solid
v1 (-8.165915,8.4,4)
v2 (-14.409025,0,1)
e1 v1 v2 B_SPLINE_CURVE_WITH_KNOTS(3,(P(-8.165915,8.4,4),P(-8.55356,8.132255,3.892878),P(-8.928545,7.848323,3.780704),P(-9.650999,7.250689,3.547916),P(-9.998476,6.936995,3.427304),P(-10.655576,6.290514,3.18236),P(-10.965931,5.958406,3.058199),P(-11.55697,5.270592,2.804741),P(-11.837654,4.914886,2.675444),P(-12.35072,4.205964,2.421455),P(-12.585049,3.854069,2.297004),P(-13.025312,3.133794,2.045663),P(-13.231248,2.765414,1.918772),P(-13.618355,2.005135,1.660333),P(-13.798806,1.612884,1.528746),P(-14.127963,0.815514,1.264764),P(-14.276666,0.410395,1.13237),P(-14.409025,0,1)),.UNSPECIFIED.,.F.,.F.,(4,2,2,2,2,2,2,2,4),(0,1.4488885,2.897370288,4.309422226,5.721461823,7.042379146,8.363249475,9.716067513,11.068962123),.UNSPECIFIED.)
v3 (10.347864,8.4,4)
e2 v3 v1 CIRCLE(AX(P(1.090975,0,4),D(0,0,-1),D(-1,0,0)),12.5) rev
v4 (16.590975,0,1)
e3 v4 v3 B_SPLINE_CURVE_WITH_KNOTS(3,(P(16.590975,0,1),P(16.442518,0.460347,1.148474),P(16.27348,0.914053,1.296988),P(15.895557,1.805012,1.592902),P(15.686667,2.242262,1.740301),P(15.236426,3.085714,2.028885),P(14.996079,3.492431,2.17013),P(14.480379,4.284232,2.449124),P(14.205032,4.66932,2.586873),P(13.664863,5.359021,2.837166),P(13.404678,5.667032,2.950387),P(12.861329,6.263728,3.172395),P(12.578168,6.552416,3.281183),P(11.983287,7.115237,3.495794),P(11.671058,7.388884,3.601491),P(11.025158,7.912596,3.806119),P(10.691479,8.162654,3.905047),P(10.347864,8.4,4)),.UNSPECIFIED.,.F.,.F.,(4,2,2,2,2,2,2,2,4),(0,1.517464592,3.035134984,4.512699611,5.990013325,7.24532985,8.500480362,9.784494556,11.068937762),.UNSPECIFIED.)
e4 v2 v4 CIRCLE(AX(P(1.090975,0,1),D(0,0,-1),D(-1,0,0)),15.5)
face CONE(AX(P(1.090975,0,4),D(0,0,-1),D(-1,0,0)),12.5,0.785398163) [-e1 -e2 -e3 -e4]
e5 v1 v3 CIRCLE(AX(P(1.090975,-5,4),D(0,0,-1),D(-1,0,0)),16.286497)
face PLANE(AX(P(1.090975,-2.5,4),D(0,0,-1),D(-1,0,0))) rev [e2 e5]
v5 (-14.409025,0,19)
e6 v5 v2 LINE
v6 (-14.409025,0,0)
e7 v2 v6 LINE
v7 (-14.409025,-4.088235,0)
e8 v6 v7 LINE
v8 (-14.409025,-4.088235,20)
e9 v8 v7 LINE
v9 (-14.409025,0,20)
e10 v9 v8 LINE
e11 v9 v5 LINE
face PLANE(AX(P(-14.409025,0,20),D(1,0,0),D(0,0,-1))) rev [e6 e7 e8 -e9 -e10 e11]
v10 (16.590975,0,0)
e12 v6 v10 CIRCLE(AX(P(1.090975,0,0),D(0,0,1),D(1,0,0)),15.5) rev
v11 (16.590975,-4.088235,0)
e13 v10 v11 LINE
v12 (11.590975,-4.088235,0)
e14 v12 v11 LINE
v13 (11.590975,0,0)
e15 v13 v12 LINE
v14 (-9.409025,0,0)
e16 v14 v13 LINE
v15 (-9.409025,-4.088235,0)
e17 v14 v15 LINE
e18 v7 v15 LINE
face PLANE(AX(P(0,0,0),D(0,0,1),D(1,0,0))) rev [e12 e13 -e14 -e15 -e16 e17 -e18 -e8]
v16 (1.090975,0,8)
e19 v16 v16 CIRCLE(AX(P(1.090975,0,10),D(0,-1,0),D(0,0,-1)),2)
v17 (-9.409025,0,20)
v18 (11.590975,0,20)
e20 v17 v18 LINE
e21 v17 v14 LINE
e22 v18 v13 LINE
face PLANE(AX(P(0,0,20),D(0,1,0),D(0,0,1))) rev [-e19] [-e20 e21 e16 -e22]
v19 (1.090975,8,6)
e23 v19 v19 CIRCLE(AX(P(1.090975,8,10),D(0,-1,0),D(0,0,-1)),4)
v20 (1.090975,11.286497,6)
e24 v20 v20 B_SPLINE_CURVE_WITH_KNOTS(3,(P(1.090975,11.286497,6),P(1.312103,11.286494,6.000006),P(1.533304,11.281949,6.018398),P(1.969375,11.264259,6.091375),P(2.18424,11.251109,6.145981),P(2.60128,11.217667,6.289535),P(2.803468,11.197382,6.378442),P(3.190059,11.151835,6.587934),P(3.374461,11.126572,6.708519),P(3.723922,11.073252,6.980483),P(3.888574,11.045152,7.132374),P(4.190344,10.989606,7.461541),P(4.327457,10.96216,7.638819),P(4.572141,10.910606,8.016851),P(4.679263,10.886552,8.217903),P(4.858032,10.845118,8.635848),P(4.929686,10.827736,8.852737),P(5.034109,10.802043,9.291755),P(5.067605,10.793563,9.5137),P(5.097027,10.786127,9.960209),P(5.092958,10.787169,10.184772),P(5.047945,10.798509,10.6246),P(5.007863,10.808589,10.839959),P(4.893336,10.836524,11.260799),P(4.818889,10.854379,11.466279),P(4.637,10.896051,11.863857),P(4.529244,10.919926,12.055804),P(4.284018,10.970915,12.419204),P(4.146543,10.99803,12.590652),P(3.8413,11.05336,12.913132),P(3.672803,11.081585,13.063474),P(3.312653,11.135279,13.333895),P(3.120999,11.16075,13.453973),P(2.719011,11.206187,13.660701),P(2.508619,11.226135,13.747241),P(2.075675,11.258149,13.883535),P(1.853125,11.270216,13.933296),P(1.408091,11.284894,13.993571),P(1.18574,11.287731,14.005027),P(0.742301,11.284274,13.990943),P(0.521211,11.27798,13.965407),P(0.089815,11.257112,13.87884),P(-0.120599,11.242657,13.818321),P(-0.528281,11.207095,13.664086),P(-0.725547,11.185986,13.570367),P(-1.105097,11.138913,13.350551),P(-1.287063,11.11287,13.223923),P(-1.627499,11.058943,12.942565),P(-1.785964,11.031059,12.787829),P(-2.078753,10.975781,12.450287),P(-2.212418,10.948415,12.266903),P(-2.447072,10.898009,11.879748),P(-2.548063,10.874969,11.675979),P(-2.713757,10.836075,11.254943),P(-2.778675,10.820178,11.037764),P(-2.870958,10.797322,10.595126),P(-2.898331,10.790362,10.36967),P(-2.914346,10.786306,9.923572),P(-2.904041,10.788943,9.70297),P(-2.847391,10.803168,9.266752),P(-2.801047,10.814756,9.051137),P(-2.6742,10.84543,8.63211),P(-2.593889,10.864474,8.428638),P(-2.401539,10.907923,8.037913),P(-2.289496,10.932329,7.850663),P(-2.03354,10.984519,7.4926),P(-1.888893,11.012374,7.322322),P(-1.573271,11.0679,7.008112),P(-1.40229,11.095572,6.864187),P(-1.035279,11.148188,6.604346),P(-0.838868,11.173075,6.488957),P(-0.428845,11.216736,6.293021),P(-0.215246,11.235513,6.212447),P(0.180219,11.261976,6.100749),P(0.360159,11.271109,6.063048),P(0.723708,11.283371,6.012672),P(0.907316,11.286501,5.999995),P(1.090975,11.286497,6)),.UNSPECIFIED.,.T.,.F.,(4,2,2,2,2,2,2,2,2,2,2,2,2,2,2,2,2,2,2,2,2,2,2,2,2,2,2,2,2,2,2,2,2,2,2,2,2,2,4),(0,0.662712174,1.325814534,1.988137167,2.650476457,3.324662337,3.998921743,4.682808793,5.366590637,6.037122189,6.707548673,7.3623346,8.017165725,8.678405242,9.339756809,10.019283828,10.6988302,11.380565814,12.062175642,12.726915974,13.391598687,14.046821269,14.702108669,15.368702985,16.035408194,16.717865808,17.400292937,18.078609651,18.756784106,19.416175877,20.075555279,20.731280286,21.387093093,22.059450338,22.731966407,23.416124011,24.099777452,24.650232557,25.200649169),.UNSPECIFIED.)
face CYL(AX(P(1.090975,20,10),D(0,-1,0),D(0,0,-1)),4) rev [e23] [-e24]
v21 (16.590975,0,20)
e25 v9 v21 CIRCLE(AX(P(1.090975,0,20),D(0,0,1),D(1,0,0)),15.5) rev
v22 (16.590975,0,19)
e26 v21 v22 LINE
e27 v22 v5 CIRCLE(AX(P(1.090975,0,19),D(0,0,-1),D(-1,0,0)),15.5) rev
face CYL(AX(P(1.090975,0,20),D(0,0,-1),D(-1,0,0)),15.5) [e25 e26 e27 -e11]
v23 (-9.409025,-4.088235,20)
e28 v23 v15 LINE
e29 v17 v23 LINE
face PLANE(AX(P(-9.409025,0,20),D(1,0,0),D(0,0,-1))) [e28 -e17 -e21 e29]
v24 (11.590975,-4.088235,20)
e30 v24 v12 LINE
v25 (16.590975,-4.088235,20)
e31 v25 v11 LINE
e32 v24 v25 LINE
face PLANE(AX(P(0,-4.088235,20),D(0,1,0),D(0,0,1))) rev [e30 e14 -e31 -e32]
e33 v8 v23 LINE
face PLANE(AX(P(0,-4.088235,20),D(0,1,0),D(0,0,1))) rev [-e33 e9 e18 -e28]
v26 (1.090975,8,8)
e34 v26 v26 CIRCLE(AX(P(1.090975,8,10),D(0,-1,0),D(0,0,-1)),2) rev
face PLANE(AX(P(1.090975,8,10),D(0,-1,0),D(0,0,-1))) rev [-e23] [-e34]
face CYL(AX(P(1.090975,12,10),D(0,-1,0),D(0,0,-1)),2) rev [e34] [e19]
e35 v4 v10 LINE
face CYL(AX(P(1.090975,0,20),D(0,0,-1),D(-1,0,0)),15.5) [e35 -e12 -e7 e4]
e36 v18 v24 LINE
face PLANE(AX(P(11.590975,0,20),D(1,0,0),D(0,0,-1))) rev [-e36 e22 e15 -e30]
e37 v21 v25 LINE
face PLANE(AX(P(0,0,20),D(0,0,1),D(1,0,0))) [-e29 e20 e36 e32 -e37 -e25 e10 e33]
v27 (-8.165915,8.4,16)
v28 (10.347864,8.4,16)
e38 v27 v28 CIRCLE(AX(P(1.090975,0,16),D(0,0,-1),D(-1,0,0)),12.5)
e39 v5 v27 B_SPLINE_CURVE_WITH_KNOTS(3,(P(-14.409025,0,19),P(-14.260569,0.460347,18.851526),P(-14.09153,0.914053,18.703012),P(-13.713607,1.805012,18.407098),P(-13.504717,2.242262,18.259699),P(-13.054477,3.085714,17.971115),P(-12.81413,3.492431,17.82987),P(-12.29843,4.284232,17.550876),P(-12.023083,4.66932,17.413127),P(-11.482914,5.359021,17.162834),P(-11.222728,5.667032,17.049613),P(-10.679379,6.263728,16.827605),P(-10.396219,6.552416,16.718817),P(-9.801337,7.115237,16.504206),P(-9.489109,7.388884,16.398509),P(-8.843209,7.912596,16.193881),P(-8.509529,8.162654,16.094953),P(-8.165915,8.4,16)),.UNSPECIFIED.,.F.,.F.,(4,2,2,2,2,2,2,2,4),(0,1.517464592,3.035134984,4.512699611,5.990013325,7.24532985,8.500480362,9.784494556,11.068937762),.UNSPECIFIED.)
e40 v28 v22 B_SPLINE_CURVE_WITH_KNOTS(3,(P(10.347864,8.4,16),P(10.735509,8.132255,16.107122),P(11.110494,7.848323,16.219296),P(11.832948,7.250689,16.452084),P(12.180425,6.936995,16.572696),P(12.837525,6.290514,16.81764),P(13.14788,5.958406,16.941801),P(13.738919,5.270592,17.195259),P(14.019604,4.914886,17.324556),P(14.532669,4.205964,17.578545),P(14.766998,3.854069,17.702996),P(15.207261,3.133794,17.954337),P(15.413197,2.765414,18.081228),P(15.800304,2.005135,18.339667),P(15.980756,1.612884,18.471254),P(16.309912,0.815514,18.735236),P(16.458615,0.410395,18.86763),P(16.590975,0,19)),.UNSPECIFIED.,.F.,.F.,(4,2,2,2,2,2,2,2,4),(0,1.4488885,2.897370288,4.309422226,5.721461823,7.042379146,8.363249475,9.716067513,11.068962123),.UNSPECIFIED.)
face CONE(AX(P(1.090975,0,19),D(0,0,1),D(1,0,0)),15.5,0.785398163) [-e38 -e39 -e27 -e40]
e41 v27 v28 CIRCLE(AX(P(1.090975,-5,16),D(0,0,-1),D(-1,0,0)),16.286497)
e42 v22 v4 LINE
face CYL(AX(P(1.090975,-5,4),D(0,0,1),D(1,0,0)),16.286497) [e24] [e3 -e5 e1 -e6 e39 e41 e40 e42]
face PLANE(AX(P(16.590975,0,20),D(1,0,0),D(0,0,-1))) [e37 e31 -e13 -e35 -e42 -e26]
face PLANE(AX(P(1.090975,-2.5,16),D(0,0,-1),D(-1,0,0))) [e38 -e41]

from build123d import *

# Parameters (mm, degrees)
ESQUISSE1_W             = 5
ESQUISSE1_H             = 4.088235294
BOSS_EXTRU_1_DEPTH      = 20
ENL_V_START             = -16
ENL_V_MAT_EXTRU_1_DEPTH = 12
CHANFREIN1_SIZE         = 3
ESQUISSE3_R             = 2
ENL_V_MAT_EXTRU_2_DEPTH = 12
ENL_V_START_2           = -8
ESQUISSE4_R             = 4
ENL_V_MAT_EXTRU_3_DEPTH = 12


with BuildPart() as part:
    # Esquisse1 → Boss.-Extru.1 (new body)
    with BuildSketch(Plane.XY):
        with BuildLine():
            ThreePointArc((-14.409025375, 0), (1.090974625, 15.5), (16.590974625, 0))
            Line((16.590974625, 0), (11.590974625, 0))
            Line((11.590974625, 0), (-9.409025375, 0))
            Line((-9.409025375, 0), (-14.409025375, 0))
        make_face()
        with Locations((-11.909025375, -2.044117647)):
            Rectangle(ESQUISSE1_W, ESQUISSE1_H)
        with Locations((14.090974625, -2.044117647)):
            Rectangle(ESQUISSE1_W, ESQUISSE1_H)
    extrude(amount=BOSS_EXTRU_1_DEPTH)

    # Esquisse2 → Enlèv. mat.-Extru.1 (cut)
    with BuildSketch(Plane.XY.offset(20).offset(ENL_V_START)):
        with BuildLine():
            ThreePointArc((-14.409025375, 0), (1.090974625, 11.286497475), (16.590974625, 0))
            ThreePointArc((16.590974625, 0), (1.090974625, 15.5), (-14.409025375, 0))
        make_face()
    extrude(amount=ENL_V_MAT_EXTRU_1_DEPTH, mode=Mode.SUBTRACT)

    # Chanfrein1
    # the kernel refuses this chamfer: 3 mm, written as the material it takes off along each edge
    with BuildSketch(Plane(origin=(1.090974625, 0, 4), x_dir=(0.8782789278300123, -0.4781486431328276, 0), z_dir=(-0.4781486431328276, -0.8782789278300123, 0))) as chanfrein1_piece_1_section:
        Polygon((15.5, -CHANFREIN1_SIZE), (15.5 - CHANFREIN1_SIZE, 0), (15.5, 0), align=None)
    chanfrein1_piece_1 = revolve(axis=Axis((1.090974625, 0, 4), (0, 0, 1)), revolution_arc=237.129113272, mode=Mode.PRIVATE)
    chanfrein1_piece_1 = chanfrein1_piece_1 - Plane(origin=(1.090974625, -5, 2.541086631), x_dir=(-0.9517086177605509, 0.3070027799227584, 0), z_dir=(0, 0, -1)) * Cylinder(16.286497475, 63, mode=Mode.PRIVATE)
    add(chanfrein1_piece_1, mode=Mode.SUBTRACT)
    with BuildSketch(Plane(origin=(1.090974625, 0, 16), x_dir=(0.8782789278300122, -0.4781486431328277, 0), z_dir=(-0.4781486431328277, -0.8782789278300122, 0))) as chanfrein1_piece_2_section:
        Polygon((15.5, CHANFREIN1_SIZE), (15.5 - CHANFREIN1_SIZE, 0), (15.5, 0), align=None)
    chanfrein1_piece_2 = revolve(axis=Axis((1.090974625, 0, 16), (0, 0, 1)), revolution_arc=237.129113272, mode=Mode.PRIVATE)
    chanfrein1_piece_2 = chanfrein1_piece_2 - Plane(origin=(1.090974625, -5, 17.458913369), x_dir=(-0.9517086177605509, 0.3070027799227584, 0), z_dir=(0, 0, -1)) * Cylinder(16.286497475, 62, mode=Mode.PRIVATE)
    add(chanfrein1_piece_2, mode=Mode.SUBTRACT)

    # Esquisse3 → Enlèv. mat.-Extru.2 (cut)
    with BuildSketch(Plane.XZ):
        with Locations(Location((1.090974625, 10, 0), (0, 0, 270))):
            Circle(ESQUISSE3_R)
    extrude(amount=-ENL_V_MAT_EXTRU_2_DEPTH, mode=Mode.SUBTRACT)

    # Esquisse4 → Enlèv. mat.-Extru.3 (cut)
    with BuildSketch(Plane.XZ.offset(ENL_V_START_2)):
        with Locations(Location((1.090974625, 10, 0), (0, 0, 270))):
            Circle(ESQUISSE4_R)
    extrude(amount=-ENL_V_MAT_EXTRU_3_DEPTH, mode=Mode.SUBTRACT)


solid = part.part
